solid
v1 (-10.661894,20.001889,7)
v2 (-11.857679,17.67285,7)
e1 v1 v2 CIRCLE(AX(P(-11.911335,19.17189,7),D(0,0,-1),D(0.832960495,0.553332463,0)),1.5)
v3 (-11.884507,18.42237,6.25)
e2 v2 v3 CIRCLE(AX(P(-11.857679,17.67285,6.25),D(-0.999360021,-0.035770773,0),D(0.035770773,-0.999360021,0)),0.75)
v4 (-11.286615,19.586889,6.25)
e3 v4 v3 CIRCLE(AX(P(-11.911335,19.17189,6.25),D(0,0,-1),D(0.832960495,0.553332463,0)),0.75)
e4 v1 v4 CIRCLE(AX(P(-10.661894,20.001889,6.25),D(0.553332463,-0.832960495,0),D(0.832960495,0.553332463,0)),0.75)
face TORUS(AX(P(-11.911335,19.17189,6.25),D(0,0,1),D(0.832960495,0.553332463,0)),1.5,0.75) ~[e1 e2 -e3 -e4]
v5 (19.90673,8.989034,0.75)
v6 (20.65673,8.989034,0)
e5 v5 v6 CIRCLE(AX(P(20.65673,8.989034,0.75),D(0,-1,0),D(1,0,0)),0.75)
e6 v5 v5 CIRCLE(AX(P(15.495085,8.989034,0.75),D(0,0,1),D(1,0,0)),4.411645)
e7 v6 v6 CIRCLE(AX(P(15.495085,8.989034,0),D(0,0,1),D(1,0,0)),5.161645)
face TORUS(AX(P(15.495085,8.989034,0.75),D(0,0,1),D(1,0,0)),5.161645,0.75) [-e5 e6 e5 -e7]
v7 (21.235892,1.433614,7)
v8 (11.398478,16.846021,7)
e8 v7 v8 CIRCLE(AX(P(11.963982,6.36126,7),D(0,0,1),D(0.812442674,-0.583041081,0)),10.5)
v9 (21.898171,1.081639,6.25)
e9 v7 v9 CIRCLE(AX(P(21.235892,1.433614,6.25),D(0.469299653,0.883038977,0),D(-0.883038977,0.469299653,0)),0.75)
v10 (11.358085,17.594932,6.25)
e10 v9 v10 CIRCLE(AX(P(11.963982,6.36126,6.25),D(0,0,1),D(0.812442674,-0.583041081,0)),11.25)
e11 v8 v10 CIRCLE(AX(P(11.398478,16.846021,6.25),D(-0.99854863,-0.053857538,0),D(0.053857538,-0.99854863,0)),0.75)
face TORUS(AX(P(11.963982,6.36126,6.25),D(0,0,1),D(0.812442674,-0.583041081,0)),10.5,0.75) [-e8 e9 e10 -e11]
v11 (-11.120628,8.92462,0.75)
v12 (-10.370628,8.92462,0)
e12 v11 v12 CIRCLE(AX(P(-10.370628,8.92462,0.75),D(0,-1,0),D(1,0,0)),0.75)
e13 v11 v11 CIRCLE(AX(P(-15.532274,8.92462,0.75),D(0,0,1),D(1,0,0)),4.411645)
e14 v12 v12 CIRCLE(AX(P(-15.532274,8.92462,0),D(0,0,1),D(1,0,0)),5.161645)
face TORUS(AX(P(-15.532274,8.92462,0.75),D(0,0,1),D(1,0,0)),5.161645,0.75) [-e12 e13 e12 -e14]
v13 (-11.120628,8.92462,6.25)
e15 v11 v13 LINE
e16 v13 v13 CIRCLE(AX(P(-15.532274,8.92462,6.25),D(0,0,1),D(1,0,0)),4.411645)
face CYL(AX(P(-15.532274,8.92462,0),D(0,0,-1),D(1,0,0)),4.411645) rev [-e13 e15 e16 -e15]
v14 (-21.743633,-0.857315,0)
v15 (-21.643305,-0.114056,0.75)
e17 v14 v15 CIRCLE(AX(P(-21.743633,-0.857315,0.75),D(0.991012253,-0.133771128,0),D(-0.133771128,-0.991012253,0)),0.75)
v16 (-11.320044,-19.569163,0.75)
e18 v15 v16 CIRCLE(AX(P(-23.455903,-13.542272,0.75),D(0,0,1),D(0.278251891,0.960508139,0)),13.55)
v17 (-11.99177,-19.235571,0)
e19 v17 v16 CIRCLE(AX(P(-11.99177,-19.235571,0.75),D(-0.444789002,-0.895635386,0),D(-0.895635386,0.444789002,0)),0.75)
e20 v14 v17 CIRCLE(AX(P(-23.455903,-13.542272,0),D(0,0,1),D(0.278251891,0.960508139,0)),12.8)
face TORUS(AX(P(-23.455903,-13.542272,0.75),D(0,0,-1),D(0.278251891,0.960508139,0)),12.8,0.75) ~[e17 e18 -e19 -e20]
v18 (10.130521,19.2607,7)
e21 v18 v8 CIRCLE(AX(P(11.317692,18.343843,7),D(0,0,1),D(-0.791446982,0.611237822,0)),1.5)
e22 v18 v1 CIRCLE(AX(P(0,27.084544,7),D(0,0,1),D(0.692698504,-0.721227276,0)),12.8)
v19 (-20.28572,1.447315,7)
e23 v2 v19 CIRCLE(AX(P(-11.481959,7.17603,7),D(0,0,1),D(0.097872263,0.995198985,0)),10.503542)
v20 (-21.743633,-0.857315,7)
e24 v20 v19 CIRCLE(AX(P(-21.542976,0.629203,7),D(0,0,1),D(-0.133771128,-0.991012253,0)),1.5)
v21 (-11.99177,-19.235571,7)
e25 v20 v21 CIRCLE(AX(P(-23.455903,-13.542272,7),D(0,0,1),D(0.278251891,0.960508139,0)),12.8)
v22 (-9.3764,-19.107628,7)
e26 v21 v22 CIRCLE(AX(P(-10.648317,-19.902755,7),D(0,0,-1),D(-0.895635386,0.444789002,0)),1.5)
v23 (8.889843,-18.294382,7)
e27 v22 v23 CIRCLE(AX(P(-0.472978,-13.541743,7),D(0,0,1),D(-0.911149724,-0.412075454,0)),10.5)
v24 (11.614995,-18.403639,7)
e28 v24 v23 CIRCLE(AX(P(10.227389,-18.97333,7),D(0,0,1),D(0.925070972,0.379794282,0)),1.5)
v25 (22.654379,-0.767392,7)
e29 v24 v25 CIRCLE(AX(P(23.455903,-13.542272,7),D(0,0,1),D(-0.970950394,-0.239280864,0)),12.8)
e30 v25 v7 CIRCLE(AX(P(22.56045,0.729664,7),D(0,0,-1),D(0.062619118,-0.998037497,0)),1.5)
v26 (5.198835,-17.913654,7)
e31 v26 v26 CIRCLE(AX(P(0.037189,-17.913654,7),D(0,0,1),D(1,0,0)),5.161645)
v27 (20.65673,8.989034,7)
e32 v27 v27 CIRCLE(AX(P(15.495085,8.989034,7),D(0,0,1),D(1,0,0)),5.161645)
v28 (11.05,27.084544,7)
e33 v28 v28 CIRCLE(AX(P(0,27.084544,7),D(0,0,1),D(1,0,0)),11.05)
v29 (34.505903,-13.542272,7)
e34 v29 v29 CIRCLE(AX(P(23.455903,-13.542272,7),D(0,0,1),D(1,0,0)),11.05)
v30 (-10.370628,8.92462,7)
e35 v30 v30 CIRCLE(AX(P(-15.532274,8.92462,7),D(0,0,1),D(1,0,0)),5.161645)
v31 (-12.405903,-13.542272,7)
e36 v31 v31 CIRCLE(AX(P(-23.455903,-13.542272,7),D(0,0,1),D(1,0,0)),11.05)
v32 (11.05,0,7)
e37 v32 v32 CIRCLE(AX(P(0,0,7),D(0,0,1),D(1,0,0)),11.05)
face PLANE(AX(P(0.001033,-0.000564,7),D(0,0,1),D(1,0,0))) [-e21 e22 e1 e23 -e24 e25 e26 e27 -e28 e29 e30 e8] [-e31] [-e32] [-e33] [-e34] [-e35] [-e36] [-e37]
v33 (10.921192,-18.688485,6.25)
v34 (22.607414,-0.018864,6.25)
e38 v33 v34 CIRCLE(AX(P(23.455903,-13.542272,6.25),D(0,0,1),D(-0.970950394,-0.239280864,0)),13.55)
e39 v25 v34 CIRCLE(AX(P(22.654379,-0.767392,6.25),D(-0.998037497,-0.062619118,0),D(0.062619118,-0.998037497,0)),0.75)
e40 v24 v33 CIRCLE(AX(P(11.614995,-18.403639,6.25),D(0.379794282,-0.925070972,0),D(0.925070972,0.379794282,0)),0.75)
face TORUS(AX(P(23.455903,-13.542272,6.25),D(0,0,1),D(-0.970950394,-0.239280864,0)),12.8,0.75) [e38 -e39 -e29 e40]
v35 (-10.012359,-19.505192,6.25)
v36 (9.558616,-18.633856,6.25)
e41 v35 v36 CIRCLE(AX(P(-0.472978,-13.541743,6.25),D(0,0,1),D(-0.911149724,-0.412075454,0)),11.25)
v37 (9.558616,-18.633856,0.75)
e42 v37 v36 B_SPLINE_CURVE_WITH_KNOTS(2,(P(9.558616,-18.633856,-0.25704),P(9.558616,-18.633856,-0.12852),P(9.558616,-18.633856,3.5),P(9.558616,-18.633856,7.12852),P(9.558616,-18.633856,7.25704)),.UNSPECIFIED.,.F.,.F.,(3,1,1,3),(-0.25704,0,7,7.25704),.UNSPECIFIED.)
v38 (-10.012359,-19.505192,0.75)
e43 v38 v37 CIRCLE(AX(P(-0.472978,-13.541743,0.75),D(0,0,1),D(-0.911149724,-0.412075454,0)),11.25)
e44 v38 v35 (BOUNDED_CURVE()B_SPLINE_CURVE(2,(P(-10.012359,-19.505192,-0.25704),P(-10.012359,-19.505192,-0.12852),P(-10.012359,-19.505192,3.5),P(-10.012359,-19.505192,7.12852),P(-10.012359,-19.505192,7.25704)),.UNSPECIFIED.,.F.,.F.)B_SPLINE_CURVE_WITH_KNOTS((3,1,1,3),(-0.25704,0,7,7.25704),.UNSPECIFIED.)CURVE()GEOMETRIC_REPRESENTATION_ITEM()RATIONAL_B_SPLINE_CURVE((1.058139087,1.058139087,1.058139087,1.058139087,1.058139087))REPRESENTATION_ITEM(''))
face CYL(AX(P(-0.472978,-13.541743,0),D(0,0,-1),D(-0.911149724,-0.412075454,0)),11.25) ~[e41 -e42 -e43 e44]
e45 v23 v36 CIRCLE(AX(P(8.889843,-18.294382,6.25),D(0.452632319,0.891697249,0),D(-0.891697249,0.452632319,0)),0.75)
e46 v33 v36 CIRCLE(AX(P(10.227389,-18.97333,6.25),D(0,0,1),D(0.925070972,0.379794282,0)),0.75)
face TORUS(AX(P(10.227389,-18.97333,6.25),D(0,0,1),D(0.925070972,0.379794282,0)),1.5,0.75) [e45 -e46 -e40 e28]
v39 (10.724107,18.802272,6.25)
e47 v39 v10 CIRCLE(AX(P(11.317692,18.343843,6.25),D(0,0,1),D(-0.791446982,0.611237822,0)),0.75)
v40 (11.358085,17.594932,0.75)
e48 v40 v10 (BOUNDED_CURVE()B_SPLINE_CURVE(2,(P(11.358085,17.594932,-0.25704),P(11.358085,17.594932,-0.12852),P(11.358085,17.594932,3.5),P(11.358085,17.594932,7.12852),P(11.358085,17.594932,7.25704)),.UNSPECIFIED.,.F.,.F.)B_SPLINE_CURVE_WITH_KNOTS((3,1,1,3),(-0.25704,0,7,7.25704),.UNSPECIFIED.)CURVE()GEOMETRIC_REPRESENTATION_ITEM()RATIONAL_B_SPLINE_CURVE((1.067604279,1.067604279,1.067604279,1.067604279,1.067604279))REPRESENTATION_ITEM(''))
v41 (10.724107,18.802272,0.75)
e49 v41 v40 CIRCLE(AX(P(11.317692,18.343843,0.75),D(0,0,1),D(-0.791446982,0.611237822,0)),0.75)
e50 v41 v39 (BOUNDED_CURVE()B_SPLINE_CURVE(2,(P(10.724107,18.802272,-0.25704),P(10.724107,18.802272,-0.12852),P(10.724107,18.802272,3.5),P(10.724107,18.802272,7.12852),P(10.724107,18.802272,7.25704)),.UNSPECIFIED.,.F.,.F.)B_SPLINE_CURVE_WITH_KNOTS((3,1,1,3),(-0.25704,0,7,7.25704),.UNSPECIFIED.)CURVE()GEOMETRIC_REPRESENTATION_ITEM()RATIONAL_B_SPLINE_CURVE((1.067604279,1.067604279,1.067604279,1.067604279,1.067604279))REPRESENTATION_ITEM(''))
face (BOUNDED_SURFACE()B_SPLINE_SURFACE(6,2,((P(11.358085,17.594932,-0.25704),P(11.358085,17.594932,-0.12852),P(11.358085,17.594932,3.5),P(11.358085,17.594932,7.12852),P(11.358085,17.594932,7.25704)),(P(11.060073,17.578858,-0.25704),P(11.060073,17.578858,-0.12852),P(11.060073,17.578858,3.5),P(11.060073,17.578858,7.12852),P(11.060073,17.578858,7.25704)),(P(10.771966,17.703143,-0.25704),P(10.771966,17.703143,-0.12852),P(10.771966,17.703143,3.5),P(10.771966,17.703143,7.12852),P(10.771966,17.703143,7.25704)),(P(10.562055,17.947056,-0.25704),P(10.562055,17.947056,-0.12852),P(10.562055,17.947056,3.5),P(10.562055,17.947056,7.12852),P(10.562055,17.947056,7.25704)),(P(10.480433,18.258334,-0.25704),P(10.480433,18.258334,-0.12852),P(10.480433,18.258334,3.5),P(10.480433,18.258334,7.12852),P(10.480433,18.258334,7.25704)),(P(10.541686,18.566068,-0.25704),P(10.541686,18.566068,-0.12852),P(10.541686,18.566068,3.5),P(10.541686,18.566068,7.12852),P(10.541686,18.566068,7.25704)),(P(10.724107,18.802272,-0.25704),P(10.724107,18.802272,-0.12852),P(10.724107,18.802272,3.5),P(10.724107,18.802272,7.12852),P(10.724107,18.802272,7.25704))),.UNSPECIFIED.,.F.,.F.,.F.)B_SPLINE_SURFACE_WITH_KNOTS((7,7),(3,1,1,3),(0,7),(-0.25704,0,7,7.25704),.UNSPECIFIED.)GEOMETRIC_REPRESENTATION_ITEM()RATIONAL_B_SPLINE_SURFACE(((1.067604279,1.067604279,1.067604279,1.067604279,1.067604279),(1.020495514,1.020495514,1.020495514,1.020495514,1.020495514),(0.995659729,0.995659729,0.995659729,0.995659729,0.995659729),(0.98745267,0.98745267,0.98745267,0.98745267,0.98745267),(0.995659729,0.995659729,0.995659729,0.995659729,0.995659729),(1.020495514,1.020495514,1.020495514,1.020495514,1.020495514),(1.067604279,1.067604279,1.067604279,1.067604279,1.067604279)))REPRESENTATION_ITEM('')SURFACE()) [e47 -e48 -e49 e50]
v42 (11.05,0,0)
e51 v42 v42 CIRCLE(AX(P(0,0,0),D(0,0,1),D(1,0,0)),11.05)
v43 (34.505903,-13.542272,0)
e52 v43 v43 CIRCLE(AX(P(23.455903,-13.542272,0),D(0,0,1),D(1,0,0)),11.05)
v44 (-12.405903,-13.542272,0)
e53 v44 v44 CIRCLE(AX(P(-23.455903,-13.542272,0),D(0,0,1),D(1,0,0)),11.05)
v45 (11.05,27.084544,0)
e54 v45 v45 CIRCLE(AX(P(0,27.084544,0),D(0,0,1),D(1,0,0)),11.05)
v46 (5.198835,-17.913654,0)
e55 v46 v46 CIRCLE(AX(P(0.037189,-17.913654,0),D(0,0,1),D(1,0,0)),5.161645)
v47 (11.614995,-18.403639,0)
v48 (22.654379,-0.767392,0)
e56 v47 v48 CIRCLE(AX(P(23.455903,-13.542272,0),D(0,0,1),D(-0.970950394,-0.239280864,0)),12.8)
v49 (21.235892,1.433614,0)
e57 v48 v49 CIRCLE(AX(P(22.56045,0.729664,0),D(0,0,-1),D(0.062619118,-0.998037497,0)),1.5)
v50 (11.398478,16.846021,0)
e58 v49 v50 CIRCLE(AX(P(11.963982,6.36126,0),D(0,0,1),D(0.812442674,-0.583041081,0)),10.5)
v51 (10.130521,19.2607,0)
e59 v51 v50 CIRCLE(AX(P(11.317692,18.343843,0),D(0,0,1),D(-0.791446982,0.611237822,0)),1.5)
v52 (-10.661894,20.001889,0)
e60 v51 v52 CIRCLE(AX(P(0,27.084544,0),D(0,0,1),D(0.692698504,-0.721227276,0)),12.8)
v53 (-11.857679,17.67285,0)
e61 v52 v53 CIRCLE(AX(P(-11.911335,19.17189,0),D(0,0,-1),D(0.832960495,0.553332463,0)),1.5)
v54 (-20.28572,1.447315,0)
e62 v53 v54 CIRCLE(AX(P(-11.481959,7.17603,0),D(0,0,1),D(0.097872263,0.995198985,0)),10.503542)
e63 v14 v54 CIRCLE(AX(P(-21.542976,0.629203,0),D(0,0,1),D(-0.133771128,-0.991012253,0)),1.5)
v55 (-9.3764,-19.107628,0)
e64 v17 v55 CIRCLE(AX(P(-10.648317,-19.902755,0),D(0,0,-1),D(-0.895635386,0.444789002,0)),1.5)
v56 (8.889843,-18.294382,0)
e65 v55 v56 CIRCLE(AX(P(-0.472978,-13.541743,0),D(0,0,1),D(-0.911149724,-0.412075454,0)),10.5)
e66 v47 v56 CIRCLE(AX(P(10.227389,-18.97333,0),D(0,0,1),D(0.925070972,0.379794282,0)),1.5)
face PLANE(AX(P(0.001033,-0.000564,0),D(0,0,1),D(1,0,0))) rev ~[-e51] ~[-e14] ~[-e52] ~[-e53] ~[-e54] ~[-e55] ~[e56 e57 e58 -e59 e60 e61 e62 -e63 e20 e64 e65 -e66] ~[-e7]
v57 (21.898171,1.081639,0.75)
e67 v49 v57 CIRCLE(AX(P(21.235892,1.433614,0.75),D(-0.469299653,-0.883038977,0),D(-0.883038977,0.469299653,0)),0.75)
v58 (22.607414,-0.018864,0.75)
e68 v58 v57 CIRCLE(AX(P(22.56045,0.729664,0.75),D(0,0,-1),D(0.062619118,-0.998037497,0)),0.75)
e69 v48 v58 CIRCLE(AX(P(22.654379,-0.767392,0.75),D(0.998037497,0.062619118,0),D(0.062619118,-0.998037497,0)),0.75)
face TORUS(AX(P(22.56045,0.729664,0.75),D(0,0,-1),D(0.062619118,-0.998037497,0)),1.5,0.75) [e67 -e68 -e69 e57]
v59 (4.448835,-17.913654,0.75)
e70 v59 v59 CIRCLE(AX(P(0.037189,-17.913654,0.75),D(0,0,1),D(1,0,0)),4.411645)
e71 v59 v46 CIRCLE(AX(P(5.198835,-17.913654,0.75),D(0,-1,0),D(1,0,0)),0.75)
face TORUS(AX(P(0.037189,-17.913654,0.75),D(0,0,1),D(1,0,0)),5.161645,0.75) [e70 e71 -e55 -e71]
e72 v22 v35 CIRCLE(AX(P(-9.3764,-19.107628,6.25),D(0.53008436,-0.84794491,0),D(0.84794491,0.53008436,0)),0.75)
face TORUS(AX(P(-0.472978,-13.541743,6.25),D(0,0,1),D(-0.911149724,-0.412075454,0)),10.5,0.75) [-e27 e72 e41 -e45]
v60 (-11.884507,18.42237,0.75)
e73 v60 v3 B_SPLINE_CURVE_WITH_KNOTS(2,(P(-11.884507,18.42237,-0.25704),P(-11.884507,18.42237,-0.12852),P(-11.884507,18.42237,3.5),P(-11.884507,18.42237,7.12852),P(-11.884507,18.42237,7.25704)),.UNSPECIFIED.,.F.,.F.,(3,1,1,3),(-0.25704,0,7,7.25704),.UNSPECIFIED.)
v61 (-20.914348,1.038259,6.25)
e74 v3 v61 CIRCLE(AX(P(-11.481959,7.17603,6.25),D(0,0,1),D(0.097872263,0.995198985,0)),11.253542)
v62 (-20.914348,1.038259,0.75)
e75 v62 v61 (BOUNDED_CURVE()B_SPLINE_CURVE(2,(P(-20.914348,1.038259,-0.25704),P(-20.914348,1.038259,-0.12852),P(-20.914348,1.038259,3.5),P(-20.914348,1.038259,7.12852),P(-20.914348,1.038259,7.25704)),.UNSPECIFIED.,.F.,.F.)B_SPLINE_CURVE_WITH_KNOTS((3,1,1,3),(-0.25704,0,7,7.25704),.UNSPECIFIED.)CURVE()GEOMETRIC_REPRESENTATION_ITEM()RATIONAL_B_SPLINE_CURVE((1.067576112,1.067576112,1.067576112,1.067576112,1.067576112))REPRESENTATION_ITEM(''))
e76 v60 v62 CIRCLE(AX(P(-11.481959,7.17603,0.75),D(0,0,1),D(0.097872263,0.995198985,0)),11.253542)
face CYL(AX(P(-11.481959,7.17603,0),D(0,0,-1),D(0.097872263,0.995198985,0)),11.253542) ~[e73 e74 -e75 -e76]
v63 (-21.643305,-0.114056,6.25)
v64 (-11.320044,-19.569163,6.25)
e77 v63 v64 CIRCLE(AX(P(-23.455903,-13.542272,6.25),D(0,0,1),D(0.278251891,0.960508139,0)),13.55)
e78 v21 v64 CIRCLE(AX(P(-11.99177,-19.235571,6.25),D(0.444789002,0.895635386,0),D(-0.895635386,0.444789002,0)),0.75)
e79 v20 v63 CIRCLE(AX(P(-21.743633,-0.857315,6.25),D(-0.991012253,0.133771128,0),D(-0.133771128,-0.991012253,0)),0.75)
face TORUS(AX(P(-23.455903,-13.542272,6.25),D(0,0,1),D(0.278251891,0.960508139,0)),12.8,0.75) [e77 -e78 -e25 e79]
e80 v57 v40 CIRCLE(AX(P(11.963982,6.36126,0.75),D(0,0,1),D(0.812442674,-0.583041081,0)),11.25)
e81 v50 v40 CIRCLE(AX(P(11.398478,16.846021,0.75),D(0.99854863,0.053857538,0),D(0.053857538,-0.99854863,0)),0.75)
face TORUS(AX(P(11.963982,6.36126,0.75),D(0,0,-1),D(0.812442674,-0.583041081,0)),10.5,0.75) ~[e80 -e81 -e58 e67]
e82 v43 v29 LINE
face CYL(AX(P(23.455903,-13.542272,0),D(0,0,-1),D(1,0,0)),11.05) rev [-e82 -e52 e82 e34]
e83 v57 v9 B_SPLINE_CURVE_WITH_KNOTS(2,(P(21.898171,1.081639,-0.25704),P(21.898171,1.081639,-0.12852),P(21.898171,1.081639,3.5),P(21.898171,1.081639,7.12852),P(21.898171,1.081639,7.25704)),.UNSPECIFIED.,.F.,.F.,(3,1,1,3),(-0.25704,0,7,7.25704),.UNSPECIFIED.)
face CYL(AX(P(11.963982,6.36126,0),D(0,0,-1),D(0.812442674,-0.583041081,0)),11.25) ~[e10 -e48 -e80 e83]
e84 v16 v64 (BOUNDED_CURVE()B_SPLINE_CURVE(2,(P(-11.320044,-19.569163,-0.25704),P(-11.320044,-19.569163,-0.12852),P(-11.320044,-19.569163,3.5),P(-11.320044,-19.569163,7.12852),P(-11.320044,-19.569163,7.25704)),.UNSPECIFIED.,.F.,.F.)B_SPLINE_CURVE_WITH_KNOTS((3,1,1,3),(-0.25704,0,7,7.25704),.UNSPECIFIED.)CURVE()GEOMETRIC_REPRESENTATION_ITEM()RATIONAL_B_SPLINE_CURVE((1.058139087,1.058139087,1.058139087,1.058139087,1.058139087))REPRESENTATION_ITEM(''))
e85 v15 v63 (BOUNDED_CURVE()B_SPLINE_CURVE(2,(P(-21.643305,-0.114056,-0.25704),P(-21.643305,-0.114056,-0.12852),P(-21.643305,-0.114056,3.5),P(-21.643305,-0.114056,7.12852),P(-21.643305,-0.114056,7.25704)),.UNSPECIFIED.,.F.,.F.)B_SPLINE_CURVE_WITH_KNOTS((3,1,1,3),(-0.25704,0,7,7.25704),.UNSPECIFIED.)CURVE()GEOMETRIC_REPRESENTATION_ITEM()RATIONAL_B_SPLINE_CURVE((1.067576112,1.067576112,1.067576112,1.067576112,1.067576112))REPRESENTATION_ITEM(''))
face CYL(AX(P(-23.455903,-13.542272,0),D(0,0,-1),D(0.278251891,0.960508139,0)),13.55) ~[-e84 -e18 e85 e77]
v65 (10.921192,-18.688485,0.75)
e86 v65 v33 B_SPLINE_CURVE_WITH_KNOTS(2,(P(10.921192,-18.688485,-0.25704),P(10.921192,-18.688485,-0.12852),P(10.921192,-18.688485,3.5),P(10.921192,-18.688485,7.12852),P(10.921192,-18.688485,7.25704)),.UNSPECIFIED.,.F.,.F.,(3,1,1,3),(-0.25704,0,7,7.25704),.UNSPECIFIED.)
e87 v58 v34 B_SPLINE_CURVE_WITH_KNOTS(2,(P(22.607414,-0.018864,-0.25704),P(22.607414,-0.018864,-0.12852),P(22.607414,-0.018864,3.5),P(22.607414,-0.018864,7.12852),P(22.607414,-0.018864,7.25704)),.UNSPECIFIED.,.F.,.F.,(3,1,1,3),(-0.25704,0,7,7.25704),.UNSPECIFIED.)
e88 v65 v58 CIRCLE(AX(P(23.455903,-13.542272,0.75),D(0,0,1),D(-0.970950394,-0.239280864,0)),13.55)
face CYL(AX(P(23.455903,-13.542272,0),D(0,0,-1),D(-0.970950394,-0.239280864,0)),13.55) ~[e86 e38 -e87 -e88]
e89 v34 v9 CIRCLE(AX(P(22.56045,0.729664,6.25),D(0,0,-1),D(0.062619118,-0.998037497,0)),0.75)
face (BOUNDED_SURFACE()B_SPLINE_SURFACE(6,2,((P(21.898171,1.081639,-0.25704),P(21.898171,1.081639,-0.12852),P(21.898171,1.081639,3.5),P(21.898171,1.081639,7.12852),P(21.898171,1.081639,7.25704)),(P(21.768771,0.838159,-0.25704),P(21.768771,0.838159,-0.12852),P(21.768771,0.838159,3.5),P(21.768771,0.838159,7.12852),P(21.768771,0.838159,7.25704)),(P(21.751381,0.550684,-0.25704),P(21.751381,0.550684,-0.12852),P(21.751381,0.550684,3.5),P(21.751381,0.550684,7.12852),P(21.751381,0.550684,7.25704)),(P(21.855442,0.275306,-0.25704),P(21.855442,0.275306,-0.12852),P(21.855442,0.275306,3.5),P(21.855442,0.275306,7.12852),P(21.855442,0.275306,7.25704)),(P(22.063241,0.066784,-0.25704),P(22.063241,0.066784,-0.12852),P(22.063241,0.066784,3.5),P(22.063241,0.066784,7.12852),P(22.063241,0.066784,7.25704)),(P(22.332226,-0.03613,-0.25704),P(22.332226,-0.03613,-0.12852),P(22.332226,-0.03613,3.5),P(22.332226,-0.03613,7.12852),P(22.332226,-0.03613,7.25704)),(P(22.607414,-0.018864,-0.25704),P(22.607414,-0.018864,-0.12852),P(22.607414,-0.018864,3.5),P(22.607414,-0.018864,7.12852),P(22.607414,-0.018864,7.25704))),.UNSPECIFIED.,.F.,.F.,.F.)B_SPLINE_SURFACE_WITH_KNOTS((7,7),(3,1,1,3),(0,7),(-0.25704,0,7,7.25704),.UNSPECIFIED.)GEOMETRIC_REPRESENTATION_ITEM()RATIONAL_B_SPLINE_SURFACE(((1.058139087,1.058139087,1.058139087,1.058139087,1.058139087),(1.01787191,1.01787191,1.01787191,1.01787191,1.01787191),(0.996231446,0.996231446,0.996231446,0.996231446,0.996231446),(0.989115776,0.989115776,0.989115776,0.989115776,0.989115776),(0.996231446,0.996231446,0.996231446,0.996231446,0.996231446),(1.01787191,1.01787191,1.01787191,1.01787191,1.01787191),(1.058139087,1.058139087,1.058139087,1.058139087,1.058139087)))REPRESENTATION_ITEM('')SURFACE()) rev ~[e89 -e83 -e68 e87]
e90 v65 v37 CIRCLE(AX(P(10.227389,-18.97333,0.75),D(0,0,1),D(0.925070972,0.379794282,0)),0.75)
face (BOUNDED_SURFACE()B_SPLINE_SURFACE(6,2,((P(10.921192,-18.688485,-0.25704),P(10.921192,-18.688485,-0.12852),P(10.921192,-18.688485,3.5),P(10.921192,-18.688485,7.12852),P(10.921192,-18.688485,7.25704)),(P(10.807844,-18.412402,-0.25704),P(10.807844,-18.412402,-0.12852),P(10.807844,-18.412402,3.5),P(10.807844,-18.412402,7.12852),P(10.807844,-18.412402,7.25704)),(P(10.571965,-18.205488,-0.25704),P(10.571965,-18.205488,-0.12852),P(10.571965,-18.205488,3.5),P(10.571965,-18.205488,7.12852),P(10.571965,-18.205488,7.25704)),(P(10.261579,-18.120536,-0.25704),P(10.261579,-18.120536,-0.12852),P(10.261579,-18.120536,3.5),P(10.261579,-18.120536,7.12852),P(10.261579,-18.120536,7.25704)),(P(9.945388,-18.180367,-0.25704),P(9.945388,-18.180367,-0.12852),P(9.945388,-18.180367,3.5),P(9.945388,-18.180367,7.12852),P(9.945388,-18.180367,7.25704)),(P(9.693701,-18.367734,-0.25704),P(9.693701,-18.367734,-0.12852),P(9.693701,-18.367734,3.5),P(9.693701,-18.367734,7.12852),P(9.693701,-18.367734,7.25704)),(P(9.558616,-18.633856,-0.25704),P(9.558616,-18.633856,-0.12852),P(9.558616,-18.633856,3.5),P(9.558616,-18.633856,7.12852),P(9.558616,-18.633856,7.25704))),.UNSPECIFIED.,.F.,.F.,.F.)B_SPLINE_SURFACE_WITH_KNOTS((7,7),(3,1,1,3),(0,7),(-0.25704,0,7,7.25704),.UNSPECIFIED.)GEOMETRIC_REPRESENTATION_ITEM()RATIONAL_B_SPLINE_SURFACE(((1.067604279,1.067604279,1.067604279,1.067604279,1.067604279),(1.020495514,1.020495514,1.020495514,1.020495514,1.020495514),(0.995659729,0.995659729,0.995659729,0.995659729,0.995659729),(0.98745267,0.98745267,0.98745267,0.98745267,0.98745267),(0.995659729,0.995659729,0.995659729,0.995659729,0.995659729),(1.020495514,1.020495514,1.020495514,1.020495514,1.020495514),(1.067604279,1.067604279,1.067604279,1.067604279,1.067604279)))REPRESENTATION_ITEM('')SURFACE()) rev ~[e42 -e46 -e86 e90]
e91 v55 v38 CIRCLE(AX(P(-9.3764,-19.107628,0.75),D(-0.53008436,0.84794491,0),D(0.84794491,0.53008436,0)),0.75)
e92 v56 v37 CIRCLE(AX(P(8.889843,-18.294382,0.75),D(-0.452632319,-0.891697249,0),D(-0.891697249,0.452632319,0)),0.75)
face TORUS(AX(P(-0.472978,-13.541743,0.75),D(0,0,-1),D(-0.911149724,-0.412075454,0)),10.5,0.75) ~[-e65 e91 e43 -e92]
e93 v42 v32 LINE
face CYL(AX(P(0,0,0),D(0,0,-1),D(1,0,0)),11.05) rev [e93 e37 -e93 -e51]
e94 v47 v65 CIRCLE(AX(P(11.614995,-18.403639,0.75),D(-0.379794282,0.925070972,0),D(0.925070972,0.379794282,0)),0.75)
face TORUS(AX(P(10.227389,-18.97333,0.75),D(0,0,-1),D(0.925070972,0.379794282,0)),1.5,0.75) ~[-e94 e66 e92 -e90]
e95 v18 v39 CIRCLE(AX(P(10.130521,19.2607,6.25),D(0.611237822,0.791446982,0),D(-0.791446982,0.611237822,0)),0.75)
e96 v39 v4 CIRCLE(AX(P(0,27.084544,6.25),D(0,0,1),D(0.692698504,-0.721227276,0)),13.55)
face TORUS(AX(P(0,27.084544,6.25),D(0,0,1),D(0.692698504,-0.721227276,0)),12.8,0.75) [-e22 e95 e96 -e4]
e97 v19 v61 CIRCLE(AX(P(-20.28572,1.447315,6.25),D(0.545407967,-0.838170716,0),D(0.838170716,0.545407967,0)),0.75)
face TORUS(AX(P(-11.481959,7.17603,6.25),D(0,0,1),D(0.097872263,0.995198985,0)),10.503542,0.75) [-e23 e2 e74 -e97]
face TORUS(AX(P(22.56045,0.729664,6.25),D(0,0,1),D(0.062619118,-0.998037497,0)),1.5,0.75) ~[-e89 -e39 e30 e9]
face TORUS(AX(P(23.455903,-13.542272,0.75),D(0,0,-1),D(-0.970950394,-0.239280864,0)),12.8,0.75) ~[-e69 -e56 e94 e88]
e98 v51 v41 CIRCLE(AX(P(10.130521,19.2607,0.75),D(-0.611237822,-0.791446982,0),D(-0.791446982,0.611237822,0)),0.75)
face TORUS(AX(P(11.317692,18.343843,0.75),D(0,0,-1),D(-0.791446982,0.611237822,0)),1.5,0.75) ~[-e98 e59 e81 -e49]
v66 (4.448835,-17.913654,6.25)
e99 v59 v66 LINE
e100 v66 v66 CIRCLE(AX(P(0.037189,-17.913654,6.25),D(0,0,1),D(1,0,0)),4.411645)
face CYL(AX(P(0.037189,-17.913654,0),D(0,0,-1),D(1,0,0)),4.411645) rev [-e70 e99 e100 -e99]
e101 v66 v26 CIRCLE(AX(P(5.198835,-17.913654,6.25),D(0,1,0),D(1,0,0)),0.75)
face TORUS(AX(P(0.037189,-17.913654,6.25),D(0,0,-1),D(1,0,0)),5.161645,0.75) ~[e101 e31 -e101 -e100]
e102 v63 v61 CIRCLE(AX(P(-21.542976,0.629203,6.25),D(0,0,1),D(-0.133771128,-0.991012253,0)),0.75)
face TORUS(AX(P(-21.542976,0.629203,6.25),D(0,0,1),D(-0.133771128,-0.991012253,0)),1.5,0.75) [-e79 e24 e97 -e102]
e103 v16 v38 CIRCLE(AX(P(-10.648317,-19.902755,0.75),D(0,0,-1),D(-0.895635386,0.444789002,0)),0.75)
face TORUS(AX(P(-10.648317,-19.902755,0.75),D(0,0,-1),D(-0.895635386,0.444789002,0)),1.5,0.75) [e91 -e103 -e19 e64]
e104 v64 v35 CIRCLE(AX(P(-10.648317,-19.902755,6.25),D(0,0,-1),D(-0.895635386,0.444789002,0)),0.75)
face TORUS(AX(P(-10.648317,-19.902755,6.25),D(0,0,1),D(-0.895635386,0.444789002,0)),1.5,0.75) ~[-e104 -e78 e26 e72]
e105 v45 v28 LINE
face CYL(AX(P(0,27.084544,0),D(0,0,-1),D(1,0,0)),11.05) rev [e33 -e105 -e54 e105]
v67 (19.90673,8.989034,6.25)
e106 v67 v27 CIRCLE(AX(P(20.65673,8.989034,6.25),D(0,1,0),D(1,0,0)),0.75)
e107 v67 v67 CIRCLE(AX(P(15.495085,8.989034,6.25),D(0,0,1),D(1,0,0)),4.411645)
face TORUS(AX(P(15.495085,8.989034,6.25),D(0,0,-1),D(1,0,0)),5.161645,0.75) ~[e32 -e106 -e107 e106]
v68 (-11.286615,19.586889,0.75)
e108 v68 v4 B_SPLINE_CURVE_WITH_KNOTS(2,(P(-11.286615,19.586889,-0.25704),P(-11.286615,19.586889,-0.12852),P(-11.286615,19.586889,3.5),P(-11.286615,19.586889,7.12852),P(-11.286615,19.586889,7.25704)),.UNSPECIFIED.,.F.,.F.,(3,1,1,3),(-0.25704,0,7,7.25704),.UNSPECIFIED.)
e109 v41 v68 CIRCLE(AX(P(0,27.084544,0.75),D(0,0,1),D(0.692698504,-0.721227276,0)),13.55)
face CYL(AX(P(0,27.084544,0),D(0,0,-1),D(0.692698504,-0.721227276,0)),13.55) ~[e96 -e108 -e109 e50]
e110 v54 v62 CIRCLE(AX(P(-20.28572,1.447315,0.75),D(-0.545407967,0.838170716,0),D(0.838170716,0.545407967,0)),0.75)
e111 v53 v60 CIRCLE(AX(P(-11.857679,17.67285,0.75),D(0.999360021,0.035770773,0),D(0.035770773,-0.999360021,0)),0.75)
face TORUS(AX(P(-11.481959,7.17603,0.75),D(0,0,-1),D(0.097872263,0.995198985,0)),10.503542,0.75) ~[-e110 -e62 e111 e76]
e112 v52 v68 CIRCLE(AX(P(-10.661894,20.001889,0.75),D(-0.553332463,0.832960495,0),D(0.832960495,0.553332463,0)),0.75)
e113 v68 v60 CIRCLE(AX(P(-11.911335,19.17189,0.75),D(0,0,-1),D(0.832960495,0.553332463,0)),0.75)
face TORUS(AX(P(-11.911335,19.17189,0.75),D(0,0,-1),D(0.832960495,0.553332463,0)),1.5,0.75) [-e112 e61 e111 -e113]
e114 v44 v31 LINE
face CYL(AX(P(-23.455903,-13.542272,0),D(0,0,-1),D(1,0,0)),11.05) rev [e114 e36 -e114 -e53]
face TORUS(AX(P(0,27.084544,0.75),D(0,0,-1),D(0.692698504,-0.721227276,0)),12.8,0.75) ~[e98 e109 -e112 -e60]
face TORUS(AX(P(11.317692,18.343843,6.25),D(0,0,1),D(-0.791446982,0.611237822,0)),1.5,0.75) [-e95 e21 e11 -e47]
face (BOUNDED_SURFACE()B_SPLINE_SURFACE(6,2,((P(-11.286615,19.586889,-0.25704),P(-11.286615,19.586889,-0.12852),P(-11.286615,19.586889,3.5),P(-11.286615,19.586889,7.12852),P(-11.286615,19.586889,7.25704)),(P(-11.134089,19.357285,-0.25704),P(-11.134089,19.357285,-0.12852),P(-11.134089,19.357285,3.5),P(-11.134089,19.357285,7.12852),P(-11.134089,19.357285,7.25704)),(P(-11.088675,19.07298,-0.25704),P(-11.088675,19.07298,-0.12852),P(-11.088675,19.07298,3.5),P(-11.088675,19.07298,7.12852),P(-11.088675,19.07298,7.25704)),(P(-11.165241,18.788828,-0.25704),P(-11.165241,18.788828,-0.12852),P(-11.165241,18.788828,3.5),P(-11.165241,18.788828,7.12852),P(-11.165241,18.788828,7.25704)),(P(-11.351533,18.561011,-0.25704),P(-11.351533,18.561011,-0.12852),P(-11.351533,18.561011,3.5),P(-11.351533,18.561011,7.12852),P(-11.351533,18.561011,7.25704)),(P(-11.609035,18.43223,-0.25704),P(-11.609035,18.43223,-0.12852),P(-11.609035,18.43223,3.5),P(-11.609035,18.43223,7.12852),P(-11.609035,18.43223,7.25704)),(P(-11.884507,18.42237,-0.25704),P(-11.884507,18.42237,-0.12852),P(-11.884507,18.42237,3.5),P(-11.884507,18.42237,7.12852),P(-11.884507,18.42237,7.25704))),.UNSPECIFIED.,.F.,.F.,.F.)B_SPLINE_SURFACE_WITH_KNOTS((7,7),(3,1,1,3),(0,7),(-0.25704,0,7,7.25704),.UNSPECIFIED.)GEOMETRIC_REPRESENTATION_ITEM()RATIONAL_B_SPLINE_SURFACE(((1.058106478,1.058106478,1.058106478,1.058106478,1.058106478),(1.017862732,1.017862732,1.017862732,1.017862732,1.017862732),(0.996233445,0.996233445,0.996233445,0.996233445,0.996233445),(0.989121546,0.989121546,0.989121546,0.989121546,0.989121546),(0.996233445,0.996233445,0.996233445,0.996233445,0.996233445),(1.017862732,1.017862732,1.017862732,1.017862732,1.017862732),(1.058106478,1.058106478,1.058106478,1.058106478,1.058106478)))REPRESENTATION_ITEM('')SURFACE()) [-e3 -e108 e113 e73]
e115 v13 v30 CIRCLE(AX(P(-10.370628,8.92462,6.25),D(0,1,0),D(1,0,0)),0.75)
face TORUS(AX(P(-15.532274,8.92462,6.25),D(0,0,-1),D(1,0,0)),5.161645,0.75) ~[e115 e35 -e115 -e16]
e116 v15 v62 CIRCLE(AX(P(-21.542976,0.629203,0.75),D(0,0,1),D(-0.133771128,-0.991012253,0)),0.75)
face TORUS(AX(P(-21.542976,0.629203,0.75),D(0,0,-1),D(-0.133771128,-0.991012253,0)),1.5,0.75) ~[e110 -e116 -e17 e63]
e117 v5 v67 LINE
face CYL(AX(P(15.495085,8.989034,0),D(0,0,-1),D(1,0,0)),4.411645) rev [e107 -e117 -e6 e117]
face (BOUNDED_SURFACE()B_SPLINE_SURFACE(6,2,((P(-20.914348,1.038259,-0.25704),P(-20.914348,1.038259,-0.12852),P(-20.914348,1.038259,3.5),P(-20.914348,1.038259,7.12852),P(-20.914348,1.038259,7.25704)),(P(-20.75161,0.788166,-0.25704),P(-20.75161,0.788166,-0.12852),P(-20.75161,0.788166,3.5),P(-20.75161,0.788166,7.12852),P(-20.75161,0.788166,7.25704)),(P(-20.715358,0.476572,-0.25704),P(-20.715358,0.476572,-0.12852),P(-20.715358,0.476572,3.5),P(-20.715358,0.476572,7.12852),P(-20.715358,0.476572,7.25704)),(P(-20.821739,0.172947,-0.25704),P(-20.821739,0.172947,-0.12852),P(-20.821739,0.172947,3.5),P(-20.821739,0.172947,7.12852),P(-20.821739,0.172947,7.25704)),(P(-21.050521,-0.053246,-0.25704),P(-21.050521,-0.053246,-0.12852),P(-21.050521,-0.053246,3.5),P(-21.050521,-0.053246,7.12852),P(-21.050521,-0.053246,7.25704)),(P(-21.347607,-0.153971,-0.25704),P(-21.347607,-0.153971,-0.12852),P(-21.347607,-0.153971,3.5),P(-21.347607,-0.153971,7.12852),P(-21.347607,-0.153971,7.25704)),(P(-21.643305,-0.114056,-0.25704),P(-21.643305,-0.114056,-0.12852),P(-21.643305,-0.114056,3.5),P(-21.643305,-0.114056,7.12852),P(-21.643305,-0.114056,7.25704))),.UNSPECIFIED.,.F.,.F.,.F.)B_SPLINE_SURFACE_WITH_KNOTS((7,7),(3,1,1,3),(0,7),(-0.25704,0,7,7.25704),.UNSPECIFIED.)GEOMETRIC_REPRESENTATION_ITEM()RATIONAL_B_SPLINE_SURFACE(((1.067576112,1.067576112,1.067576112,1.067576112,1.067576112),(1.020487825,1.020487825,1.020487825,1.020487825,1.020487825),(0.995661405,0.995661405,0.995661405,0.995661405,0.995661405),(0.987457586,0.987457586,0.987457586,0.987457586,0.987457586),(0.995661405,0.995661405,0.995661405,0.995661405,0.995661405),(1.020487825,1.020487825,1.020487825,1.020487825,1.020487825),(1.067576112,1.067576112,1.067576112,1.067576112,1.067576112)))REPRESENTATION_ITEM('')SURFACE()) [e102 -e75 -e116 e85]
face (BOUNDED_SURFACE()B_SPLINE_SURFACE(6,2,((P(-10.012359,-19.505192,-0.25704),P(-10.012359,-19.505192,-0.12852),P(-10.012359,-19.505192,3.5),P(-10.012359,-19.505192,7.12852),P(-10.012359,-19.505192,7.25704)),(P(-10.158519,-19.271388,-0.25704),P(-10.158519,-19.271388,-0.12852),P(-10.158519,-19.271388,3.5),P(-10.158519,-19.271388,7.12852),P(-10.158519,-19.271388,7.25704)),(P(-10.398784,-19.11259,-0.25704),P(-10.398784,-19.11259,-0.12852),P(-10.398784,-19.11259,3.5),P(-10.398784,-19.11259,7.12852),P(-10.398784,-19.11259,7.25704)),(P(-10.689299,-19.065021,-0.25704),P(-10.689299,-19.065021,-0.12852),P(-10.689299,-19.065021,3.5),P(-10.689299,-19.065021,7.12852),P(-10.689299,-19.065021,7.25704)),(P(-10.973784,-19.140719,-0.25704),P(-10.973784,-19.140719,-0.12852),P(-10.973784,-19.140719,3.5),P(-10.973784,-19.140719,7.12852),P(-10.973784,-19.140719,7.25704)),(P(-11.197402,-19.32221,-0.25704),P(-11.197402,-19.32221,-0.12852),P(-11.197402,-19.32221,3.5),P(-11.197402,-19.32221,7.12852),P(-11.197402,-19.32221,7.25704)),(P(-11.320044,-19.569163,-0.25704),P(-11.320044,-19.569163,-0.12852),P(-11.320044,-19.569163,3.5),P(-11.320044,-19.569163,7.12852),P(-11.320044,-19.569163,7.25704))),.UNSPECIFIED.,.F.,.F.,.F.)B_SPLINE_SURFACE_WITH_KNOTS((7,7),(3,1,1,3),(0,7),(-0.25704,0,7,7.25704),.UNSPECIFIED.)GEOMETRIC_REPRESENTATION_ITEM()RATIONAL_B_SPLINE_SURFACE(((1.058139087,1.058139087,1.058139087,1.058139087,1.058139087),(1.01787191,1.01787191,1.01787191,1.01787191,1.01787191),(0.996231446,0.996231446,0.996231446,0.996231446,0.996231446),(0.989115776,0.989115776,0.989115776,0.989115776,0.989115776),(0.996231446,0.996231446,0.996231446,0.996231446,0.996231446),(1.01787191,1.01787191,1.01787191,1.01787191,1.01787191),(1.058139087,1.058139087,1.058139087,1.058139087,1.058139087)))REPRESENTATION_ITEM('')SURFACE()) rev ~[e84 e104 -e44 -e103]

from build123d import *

# Parameters (mm, degrees)
F0_R     = 11.05
F0_R_2   = 4.4116454566
F1_DEPTH = 7
F2_R     = 0.75


with BuildPart() as f1:
    # F0 (on Top) → F1 (new body)
    with BuildSketch(Plane.XY):
        with BuildLine():
            ThreePointArc((21.1039623822, -0.1979522585), (21.3135291599, 12.6181340013), (9.3860647253, 17.3119147177))
            ThreePointArc((9.3860647253, 17.3119147177), (0.7280636191, 40.6149701394), (-10.3805495065, 18.3755436728))
            ThreePointArc((-10.3805495065, 18.3755436728), (-21.5785220669, 12.1461025902), (-19.6855902963, -0.5273868652))
            ThreePointArc((-19.6855902963, -0.5273868652), (-35.5376277242, -19.6769634799), (-10.7234128757, -18.1775914143))
            ThreePointArc((-10.7234128757, -18.1775914143), (0.2708600135, -24.7671246974), (10.2995255711, -16.7845278525))
            ThreePointArc((10.2995255711, -16.7845278525), (34.8095641051, -20.9380066594), (21.1039623822, -0.1979522585))
        make_face()
        with Locations((-23.4559034146, -13.5422721505)):
            Circle(F0_R, mode=Mode.SUBTRACT)
        with Locations((0.0371890647, -17.9136538016)):
            Circle(F0_R_2, mode=Mode.SUBTRACT)
        with Locations((23.4559034146, -13.5422721505)):
            Circle(F0_R, mode=Mode.SUBTRACT)
        Circle(F0_R, mode=Mode.SUBTRACT)
        with Locations((-15.5322737992, 8.924620226)):
            Circle(F0_R_2, mode=Mode.SUBTRACT)
        with Locations((15.4950847345, 8.9890335756)):
            Circle(F0_R_2, mode=Mode.SUBTRACT)
        with Locations((0, 27.084544301)):
            Circle(F0_R, mode=Mode.SUBTRACT)
    extrude(amount=F1_DEPTH)

    # F2
    f2_edges = [f1.edges().sort_by_distance(p)[0] for p in [
        (10.299526, -16.784528, 3.5),
        (21.103962, -0.197952, 3.5),
        (34.809564, -20.938007, 0),
        (34.809564, -20.938007, 7),
        (-19.68559, -0.527387, 3.5),
        (-10.723413, -18.177591, 3.5),
        (-35.537628, -19.676963, 0),
        (-35.537628, -19.676963, 7),
        (9.386065, 17.311915, 3.5),
        (-10.38055, 18.375544, 3.5),
        (0.728064, 40.61497, 0),
        (0.728064, 40.61497, 7),
        (-4.374456, -17.913654, 7),
        (4.448835, -17.913654, 3.5),
        (-4.374456, -17.913654, 0),
        (-11.120628, 8.92462, 3.5),
        (-19.943919, 8.92462, 0),
        (-19.943919, 8.92462, 7),
        (19.90673, 8.989034, 3.5),
        (11.083439, 8.989034, 0),
        (11.083439, 8.989034, 7),
        (21.313529, 12.618134, 0),
        (21.313529, 12.618134, 7),
        (-21.578522, 12.146103, 0),
        (-21.578522, 12.146103, 7),
        (0.27086, -24.767125, 0),
        (0.27086, -24.767125, 7),
    ]]
    fillet(f2_edges, radius=F2_R)


solid = f1.part
